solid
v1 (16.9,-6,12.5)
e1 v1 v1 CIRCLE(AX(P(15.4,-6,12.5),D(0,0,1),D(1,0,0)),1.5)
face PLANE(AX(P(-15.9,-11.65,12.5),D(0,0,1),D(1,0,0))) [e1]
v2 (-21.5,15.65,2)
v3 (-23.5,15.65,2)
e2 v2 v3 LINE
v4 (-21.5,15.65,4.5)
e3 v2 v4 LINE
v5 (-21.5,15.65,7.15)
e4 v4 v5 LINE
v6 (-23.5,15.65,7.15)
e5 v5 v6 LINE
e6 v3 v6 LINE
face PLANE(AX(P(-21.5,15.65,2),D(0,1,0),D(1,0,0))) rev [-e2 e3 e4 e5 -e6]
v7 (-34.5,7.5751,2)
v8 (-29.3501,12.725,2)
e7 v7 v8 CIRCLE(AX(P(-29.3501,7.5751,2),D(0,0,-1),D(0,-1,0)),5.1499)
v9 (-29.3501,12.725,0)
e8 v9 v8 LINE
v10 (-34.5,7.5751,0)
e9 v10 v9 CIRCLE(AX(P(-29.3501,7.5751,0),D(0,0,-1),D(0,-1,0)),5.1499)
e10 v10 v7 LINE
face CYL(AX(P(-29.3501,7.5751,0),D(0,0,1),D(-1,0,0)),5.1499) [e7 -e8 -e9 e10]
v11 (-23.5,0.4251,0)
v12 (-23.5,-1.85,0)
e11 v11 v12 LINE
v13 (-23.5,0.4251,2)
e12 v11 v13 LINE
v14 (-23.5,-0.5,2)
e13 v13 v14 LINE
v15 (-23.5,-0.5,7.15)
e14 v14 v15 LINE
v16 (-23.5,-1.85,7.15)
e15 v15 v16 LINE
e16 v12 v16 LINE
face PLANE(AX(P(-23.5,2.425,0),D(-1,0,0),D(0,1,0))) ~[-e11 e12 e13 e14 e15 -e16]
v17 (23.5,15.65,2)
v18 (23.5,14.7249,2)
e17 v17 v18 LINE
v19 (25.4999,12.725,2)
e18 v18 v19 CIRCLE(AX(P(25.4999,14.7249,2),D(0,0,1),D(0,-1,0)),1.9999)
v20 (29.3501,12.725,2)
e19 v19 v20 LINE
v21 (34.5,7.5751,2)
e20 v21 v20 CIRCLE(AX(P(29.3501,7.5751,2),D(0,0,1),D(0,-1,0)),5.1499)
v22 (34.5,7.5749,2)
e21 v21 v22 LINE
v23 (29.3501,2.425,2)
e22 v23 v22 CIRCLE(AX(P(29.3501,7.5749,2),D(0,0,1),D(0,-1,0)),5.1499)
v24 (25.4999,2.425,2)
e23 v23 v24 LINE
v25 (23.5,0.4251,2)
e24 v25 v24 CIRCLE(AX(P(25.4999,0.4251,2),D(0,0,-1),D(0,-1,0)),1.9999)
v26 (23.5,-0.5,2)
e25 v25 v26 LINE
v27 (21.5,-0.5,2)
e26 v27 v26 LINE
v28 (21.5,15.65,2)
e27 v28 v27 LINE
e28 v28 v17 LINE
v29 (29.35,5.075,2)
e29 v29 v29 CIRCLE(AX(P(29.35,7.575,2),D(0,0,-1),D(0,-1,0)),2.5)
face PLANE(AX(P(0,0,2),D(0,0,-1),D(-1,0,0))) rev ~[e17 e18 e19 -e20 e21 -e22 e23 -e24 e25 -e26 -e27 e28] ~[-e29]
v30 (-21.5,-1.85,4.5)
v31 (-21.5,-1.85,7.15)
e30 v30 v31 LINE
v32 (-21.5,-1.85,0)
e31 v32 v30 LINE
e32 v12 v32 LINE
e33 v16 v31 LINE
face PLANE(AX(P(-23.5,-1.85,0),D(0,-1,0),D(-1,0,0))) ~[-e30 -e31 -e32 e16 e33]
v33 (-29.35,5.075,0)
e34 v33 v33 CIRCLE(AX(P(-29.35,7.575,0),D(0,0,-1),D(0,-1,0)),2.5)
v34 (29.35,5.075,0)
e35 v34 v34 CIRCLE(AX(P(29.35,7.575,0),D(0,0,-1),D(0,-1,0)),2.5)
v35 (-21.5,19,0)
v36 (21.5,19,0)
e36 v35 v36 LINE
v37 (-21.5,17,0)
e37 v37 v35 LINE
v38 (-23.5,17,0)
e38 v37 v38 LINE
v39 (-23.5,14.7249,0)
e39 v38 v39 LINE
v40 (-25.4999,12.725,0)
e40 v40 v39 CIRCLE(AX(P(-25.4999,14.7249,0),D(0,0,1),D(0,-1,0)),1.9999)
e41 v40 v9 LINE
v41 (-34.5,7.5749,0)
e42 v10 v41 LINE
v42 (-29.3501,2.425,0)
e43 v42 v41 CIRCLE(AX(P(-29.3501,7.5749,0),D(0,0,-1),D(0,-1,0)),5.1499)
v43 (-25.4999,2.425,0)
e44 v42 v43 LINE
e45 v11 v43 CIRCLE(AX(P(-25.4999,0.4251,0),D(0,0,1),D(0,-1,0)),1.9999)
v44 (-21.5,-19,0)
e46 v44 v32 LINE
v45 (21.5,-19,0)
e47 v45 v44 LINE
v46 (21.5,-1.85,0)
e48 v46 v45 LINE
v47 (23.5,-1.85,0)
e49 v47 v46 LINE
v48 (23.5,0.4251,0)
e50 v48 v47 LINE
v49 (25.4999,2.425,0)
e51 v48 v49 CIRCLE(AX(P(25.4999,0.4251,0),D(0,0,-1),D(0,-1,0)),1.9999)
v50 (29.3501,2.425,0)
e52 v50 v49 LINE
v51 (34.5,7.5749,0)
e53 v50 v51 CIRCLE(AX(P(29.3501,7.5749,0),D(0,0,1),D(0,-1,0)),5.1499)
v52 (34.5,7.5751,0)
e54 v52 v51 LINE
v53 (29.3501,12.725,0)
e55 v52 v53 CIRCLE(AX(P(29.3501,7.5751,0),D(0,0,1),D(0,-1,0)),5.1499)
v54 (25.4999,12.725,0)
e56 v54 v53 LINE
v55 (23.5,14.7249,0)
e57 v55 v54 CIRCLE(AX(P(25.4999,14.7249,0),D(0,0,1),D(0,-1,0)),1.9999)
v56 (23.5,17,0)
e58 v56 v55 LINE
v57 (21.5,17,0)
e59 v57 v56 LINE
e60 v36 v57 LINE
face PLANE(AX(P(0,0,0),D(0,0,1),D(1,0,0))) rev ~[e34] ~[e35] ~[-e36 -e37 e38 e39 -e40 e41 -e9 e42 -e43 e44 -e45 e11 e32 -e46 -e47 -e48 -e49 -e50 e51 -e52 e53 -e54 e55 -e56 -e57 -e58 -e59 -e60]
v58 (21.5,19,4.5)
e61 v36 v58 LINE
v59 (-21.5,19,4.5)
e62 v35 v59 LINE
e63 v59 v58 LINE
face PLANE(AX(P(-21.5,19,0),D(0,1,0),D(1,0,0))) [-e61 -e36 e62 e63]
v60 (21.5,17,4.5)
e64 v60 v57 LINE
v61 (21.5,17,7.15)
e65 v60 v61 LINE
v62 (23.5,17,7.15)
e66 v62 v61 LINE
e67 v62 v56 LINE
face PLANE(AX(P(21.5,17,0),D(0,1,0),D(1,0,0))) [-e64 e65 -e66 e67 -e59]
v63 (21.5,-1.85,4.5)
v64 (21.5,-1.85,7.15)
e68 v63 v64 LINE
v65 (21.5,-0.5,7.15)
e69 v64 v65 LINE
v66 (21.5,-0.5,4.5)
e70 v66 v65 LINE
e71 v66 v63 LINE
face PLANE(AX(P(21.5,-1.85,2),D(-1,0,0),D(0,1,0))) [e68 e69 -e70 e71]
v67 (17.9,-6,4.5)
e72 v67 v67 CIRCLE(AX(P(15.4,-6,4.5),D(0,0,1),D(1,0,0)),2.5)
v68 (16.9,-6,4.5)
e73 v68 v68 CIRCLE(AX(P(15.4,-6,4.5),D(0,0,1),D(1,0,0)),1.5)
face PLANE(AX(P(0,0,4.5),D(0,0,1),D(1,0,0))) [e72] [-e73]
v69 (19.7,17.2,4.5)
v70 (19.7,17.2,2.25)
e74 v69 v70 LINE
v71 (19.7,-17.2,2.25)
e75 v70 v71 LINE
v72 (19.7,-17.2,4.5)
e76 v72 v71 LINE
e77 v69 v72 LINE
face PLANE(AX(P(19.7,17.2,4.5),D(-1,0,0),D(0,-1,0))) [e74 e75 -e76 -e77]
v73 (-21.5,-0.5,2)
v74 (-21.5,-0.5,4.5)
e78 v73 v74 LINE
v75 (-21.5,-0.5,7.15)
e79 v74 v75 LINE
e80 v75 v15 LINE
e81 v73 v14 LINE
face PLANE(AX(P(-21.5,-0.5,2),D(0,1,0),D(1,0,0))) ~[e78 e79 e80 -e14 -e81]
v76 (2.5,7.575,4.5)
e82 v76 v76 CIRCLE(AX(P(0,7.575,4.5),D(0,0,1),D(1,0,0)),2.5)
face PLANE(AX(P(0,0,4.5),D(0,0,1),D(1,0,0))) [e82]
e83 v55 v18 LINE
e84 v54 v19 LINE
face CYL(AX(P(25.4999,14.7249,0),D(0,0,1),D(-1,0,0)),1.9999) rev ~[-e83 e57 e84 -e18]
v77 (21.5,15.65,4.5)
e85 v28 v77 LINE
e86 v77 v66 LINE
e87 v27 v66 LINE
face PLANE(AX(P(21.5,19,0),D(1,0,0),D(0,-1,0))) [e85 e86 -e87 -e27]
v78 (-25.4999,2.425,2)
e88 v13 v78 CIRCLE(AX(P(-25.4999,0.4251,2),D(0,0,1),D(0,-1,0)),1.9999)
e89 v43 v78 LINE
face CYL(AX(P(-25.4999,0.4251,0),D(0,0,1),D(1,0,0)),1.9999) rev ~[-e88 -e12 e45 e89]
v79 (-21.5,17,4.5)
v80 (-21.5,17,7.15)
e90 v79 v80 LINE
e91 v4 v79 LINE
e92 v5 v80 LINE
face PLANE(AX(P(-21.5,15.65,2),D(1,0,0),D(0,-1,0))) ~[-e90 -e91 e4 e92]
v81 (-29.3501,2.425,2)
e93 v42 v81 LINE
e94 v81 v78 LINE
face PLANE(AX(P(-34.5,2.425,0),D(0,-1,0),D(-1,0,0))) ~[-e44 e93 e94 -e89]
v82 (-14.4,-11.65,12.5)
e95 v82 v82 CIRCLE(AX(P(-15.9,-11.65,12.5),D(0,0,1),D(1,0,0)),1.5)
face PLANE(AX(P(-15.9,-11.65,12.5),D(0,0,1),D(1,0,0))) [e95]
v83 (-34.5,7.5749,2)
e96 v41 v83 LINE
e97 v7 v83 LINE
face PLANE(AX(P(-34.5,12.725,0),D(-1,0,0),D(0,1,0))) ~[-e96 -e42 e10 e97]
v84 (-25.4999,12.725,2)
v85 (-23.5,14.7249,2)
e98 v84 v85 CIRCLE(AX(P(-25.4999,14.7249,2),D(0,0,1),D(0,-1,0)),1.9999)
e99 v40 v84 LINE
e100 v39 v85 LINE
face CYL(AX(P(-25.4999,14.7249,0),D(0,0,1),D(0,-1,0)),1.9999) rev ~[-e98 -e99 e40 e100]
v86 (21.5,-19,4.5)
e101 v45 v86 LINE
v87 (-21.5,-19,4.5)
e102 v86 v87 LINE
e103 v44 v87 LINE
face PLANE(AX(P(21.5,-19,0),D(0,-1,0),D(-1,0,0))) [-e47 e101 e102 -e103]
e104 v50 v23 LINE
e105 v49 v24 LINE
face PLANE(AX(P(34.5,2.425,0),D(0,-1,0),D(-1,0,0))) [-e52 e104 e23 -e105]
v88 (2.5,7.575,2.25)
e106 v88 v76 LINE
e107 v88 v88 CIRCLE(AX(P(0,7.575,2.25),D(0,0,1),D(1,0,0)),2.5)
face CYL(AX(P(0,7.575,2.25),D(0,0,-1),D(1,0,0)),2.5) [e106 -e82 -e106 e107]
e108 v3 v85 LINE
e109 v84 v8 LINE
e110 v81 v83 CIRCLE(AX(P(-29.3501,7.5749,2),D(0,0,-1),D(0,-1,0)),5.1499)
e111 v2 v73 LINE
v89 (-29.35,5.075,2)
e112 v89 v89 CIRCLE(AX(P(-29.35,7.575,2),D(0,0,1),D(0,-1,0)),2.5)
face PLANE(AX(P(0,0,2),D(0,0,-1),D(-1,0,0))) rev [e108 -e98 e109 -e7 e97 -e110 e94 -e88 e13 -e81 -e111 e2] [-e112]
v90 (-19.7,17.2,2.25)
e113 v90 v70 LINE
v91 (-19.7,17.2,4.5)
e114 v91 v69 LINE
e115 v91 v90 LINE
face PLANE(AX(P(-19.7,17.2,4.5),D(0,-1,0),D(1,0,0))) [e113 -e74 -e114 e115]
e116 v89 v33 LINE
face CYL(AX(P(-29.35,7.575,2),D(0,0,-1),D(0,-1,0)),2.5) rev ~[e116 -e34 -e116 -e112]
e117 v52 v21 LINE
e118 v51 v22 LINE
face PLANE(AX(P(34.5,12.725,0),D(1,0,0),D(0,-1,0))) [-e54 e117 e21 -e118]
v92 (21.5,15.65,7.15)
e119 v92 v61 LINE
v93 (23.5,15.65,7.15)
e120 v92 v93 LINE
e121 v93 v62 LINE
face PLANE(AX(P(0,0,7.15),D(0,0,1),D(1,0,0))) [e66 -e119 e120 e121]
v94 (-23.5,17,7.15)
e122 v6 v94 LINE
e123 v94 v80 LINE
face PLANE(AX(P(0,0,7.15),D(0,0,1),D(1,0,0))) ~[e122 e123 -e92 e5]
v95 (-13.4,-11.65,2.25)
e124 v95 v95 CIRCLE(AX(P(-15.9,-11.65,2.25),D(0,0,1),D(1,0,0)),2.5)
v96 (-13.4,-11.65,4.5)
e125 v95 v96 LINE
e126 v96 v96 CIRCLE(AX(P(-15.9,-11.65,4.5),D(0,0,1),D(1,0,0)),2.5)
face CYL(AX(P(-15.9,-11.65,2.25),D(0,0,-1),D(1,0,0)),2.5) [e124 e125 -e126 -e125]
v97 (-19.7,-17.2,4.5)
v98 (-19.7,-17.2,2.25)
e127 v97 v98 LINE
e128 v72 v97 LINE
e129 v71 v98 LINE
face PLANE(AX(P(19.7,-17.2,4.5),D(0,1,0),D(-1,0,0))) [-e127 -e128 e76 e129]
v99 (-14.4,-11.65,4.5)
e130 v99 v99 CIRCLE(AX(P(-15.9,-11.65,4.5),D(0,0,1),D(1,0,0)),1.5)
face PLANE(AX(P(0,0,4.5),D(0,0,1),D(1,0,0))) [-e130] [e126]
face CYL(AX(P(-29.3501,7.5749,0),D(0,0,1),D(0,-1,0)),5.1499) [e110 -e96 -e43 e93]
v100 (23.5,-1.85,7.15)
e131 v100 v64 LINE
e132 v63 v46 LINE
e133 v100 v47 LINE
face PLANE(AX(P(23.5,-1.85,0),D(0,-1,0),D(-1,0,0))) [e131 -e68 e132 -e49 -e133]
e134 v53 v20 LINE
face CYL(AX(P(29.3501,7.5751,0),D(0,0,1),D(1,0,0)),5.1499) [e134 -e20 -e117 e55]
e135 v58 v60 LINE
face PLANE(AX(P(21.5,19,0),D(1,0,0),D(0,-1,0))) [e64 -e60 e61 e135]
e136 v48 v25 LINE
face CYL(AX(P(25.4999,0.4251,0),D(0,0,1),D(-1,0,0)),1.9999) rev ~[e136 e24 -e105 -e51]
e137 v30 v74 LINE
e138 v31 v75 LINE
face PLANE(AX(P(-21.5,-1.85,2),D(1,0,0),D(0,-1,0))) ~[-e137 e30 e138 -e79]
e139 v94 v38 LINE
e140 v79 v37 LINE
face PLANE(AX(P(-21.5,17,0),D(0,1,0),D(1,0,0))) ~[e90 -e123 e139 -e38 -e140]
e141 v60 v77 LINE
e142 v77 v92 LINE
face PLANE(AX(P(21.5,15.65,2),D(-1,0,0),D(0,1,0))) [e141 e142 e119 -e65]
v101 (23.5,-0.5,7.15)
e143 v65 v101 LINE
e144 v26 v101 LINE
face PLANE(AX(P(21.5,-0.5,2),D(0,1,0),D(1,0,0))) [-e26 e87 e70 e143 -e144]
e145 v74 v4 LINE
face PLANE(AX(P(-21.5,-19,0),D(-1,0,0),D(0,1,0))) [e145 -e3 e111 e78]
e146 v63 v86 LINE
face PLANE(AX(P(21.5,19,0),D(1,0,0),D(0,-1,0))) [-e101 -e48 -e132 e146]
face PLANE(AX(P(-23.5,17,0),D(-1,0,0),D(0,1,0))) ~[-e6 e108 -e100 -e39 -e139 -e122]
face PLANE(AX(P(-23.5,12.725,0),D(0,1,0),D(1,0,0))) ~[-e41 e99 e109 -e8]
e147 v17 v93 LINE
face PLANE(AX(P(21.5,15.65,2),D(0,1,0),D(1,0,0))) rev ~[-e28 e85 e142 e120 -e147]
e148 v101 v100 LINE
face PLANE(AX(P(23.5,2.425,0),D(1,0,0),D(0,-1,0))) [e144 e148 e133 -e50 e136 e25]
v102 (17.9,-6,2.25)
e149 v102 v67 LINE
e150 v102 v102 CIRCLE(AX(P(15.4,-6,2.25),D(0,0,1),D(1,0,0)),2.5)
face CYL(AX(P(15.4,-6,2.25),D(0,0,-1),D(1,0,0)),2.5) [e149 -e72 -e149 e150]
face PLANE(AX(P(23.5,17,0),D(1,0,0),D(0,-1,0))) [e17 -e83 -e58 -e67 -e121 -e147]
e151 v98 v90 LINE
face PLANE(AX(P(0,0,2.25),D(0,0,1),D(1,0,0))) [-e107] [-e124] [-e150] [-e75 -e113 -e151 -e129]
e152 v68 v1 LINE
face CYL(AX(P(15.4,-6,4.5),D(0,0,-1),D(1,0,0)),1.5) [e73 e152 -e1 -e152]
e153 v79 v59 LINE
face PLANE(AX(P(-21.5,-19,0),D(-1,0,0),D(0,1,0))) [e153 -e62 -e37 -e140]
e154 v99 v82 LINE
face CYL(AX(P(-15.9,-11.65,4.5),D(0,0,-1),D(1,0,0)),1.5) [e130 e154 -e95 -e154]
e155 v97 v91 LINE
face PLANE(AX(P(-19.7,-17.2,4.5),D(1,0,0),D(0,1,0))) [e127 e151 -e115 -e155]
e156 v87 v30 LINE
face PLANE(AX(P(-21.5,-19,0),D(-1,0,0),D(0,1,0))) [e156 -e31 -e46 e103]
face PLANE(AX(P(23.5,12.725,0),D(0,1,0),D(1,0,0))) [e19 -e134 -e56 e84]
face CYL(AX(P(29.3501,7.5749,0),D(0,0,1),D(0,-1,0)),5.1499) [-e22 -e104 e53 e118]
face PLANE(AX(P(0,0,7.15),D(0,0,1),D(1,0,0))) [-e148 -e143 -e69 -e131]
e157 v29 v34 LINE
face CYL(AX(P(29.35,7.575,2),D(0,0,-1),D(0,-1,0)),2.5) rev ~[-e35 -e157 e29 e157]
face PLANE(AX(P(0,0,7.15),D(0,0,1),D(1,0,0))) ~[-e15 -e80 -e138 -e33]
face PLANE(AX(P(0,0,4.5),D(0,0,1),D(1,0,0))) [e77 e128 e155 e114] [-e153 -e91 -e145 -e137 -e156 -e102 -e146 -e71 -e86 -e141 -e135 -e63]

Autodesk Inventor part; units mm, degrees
ref_plane "YZ Plane" through (0, 0, 0) normal (1, 0, 0) x (0, 1, 0)
ref_plane "XZ Plane" through (0, 0, 0) normal (0, 1, 0) x (-1, 0, 0)
ref_plane "XY Plane" through (0, 0, 0) normal (0, 0, 1) x (1, 0, 0)
sketch "Sketch1" plane through (0, 0, 0) normal (0, 0, 1) x (1, 0, 0)
  line L0 (-21.5, 19) -> (21.5, 19)
  line L1 (21.5, 19) -> (21.5, -19)
  line L2 (21.5, -19) -> (-21.5, -19)
  line L3 (-21.5, -19) -> (-21.5, 19)
  line L4 (0, 0) -> (0, 19) construction
  line L5 (0, 0) -> (0, -19) construction
  line L6 (0, 0) -> (21.5, 0) construction
  line L7 (0, 0) -> (-21.5, 0) construction
  dimension "d0" = 43
  dimension "d1" = 38
extrude "Extrusion1" add sketch "Sketch1" along normal blind 4.5
sketch "Sketch2" plane through (0, 0, 4.5) normal (0, 0, 1) x (1, 0, 0)
  line L0 (21.5, 19) -> (21.5, -19) projected
  line L1 (-21.5, 19) -> (21.5, 19) projected
  line L2 (-21.5, -19) -> (-21.5, 19) projected
  line L3 (21.5, -19) -> (-21.5, -19) projected
  line L4 (19.7, 17.2) -> (19.7, -17.2)
  line L5 (19.7, -17.2) -> (-19.7, -17.2)
  line L6 (-19.7, -17.2) -> (-19.7, 17.2)
  line L7 (-19.7, 17.2) -> (19.7, 17.2)
  dimension "d4" = 1.8
extrude "Extrusion2" cut sketch "Sketch2" against normal blind 2.25 contours L4 L5 L6 L7
sketch "Sketch3" plane through (0, 0, 0) normal (0, 0, -1) x (-1, 0, 0)
  line L0 (21.5, 19) -> (-21.5, 19) projected
  line L1 (-21.5, 19) -> (-21.5, -19) projected
  line L2 (-21.5, 17) -> (-23.5, 17)
  line L3 (-23.5, 17) -> (-23.5, 12.725)
  line L4 (-23.5, 12.725) -> (-34.5, 12.725)
  line L5 (-34.5, 12.725) -> (-34.5, 2.425)
  line L6 (-34.5, 2.425) -> (-23.5, 2.425)
  line L7 (-23.5, 2.425) -> (-23.5, -1.85)
  line L8 (-23.5, -1.85) -> (-21.5, -1.85)
  dimension "d7" = 2
  dimension "d8" = 2
  dimension "d9" = 18.85
  dimension "d10" = 10.3
  dimension "d11" = 13
extrude "Extrusion3" add sketch "Sketch3" against normal blind 2
fillet "Fillet1" radius 5.15 2 edges at (34.5, 2.425, 1) (34.5, 12.725, 1)
fillet "Fillet1" radius 2 2 edges at (23.5, 2.425, 1) (23.5, 12.725, 1)
sketch "Sketch4" plane through (0, 0, 2) normal (0, 0, 1) x (1, 0, 0)
  arc A0 (29.35, 2.425) -> (29.35, 12.725) centre (29.35, 7.575) ccw projected
hole "Hole1" at (29.35, 7.575, 2) direction (0, 0, -1) diameter 5 end through all
sketch "Sketch5" plane through (0, 0, 2) normal (0, 0, 1) x (1, 0, 0)
  line L0 (21.5, -1.85) -> (21.5, 17) projected
  line L1 (23.5, -1.85) -> (21.5, -1.85)
  line L2 (21.5, -1.85) -> (21.5, -0.5)
  line L3 (21.5, -0.5) -> (23.5, -0.5)
  line L4 (23.5, -0.5) -> (23.5, -1.85)
  line L5 (23.5, 17) -> (21.5, 17)
  line L6 (21.5, 17) -> (21.5, 15.65)
  line L7 (21.5, 15.65) -> (23.5, 15.65)
  line L8 (23.5, 15.65) -> (23.5, 17)
  dimension "d23" = 1.35
extrude "Extrusion4" add sketch "Sketch5" along normal blind 5.15
mirror "Mirror1" about plane through (0, 0, 0) normal (1, 0, 0) of "Extrusion4", "Hole1", "Extrusion3", "Fillet1"
sketch "Sketch6" plane through (0, 0, 2.25) normal (0, 0, 1) x (1, 0, 0)
  circle A0 centre (0, 7.575) radius 2.5
  line L0 (-21.5, 19) -> (21.5, 19) projected
  circle A1 centre (-29.35, 7.575) radius 2.5 projected
  point P0 (0, 0)
  dimension "d26" = 5
extrude "Extrusion5" add sketch "Sketch6" along normal up to surface (2.25 mm away) contours A0
sketch "Sketch7" plane through (0, 0, 2.25) normal (0, 0, 1) x (1, 0, 0)
  circle A0 centre (-15.9, -11.65) radius 2.5
  circle A1 centre (15.4, -6) radius 2.5
  line L0 (-21.5, -19) -> (-21.5, -1.85) projected
  line L1 (21.5, -19) -> (-21.5, -19) projected
  line L2 (21.5, -1.85) -> (21.5, -19) projected
  dimension "d30" = 5
  dimension "d31" = 5.6
  dimension "d32" = 7.35
  dimension "d33" = 6.1
  dimension "d34" = 13
extrude "Extrusion6" add sketch "Sketch7" along normal up to surface (2.25 mm away)
sketch "Sketch8" plane through (-15.9, -11.65, 4.5) normal (0, 0, 1) x (1, 0, 0)
  circle A0 centre (0, 0) radius 2.5 projected
  circle A1 centre (0, 0) radius 1.5
  circle A2 centre (31.3, 5.65) radius 2.5 projected
  circle A3 centre (31.3, 5.65) radius 1.5
  dimension "d37" = 3
extrude "Extrusion7" add sketch "Sketch8" along normal blind 8 contours A1 | A3
properties part number "Spike Bottom Cover" material "ABS Plastic"
